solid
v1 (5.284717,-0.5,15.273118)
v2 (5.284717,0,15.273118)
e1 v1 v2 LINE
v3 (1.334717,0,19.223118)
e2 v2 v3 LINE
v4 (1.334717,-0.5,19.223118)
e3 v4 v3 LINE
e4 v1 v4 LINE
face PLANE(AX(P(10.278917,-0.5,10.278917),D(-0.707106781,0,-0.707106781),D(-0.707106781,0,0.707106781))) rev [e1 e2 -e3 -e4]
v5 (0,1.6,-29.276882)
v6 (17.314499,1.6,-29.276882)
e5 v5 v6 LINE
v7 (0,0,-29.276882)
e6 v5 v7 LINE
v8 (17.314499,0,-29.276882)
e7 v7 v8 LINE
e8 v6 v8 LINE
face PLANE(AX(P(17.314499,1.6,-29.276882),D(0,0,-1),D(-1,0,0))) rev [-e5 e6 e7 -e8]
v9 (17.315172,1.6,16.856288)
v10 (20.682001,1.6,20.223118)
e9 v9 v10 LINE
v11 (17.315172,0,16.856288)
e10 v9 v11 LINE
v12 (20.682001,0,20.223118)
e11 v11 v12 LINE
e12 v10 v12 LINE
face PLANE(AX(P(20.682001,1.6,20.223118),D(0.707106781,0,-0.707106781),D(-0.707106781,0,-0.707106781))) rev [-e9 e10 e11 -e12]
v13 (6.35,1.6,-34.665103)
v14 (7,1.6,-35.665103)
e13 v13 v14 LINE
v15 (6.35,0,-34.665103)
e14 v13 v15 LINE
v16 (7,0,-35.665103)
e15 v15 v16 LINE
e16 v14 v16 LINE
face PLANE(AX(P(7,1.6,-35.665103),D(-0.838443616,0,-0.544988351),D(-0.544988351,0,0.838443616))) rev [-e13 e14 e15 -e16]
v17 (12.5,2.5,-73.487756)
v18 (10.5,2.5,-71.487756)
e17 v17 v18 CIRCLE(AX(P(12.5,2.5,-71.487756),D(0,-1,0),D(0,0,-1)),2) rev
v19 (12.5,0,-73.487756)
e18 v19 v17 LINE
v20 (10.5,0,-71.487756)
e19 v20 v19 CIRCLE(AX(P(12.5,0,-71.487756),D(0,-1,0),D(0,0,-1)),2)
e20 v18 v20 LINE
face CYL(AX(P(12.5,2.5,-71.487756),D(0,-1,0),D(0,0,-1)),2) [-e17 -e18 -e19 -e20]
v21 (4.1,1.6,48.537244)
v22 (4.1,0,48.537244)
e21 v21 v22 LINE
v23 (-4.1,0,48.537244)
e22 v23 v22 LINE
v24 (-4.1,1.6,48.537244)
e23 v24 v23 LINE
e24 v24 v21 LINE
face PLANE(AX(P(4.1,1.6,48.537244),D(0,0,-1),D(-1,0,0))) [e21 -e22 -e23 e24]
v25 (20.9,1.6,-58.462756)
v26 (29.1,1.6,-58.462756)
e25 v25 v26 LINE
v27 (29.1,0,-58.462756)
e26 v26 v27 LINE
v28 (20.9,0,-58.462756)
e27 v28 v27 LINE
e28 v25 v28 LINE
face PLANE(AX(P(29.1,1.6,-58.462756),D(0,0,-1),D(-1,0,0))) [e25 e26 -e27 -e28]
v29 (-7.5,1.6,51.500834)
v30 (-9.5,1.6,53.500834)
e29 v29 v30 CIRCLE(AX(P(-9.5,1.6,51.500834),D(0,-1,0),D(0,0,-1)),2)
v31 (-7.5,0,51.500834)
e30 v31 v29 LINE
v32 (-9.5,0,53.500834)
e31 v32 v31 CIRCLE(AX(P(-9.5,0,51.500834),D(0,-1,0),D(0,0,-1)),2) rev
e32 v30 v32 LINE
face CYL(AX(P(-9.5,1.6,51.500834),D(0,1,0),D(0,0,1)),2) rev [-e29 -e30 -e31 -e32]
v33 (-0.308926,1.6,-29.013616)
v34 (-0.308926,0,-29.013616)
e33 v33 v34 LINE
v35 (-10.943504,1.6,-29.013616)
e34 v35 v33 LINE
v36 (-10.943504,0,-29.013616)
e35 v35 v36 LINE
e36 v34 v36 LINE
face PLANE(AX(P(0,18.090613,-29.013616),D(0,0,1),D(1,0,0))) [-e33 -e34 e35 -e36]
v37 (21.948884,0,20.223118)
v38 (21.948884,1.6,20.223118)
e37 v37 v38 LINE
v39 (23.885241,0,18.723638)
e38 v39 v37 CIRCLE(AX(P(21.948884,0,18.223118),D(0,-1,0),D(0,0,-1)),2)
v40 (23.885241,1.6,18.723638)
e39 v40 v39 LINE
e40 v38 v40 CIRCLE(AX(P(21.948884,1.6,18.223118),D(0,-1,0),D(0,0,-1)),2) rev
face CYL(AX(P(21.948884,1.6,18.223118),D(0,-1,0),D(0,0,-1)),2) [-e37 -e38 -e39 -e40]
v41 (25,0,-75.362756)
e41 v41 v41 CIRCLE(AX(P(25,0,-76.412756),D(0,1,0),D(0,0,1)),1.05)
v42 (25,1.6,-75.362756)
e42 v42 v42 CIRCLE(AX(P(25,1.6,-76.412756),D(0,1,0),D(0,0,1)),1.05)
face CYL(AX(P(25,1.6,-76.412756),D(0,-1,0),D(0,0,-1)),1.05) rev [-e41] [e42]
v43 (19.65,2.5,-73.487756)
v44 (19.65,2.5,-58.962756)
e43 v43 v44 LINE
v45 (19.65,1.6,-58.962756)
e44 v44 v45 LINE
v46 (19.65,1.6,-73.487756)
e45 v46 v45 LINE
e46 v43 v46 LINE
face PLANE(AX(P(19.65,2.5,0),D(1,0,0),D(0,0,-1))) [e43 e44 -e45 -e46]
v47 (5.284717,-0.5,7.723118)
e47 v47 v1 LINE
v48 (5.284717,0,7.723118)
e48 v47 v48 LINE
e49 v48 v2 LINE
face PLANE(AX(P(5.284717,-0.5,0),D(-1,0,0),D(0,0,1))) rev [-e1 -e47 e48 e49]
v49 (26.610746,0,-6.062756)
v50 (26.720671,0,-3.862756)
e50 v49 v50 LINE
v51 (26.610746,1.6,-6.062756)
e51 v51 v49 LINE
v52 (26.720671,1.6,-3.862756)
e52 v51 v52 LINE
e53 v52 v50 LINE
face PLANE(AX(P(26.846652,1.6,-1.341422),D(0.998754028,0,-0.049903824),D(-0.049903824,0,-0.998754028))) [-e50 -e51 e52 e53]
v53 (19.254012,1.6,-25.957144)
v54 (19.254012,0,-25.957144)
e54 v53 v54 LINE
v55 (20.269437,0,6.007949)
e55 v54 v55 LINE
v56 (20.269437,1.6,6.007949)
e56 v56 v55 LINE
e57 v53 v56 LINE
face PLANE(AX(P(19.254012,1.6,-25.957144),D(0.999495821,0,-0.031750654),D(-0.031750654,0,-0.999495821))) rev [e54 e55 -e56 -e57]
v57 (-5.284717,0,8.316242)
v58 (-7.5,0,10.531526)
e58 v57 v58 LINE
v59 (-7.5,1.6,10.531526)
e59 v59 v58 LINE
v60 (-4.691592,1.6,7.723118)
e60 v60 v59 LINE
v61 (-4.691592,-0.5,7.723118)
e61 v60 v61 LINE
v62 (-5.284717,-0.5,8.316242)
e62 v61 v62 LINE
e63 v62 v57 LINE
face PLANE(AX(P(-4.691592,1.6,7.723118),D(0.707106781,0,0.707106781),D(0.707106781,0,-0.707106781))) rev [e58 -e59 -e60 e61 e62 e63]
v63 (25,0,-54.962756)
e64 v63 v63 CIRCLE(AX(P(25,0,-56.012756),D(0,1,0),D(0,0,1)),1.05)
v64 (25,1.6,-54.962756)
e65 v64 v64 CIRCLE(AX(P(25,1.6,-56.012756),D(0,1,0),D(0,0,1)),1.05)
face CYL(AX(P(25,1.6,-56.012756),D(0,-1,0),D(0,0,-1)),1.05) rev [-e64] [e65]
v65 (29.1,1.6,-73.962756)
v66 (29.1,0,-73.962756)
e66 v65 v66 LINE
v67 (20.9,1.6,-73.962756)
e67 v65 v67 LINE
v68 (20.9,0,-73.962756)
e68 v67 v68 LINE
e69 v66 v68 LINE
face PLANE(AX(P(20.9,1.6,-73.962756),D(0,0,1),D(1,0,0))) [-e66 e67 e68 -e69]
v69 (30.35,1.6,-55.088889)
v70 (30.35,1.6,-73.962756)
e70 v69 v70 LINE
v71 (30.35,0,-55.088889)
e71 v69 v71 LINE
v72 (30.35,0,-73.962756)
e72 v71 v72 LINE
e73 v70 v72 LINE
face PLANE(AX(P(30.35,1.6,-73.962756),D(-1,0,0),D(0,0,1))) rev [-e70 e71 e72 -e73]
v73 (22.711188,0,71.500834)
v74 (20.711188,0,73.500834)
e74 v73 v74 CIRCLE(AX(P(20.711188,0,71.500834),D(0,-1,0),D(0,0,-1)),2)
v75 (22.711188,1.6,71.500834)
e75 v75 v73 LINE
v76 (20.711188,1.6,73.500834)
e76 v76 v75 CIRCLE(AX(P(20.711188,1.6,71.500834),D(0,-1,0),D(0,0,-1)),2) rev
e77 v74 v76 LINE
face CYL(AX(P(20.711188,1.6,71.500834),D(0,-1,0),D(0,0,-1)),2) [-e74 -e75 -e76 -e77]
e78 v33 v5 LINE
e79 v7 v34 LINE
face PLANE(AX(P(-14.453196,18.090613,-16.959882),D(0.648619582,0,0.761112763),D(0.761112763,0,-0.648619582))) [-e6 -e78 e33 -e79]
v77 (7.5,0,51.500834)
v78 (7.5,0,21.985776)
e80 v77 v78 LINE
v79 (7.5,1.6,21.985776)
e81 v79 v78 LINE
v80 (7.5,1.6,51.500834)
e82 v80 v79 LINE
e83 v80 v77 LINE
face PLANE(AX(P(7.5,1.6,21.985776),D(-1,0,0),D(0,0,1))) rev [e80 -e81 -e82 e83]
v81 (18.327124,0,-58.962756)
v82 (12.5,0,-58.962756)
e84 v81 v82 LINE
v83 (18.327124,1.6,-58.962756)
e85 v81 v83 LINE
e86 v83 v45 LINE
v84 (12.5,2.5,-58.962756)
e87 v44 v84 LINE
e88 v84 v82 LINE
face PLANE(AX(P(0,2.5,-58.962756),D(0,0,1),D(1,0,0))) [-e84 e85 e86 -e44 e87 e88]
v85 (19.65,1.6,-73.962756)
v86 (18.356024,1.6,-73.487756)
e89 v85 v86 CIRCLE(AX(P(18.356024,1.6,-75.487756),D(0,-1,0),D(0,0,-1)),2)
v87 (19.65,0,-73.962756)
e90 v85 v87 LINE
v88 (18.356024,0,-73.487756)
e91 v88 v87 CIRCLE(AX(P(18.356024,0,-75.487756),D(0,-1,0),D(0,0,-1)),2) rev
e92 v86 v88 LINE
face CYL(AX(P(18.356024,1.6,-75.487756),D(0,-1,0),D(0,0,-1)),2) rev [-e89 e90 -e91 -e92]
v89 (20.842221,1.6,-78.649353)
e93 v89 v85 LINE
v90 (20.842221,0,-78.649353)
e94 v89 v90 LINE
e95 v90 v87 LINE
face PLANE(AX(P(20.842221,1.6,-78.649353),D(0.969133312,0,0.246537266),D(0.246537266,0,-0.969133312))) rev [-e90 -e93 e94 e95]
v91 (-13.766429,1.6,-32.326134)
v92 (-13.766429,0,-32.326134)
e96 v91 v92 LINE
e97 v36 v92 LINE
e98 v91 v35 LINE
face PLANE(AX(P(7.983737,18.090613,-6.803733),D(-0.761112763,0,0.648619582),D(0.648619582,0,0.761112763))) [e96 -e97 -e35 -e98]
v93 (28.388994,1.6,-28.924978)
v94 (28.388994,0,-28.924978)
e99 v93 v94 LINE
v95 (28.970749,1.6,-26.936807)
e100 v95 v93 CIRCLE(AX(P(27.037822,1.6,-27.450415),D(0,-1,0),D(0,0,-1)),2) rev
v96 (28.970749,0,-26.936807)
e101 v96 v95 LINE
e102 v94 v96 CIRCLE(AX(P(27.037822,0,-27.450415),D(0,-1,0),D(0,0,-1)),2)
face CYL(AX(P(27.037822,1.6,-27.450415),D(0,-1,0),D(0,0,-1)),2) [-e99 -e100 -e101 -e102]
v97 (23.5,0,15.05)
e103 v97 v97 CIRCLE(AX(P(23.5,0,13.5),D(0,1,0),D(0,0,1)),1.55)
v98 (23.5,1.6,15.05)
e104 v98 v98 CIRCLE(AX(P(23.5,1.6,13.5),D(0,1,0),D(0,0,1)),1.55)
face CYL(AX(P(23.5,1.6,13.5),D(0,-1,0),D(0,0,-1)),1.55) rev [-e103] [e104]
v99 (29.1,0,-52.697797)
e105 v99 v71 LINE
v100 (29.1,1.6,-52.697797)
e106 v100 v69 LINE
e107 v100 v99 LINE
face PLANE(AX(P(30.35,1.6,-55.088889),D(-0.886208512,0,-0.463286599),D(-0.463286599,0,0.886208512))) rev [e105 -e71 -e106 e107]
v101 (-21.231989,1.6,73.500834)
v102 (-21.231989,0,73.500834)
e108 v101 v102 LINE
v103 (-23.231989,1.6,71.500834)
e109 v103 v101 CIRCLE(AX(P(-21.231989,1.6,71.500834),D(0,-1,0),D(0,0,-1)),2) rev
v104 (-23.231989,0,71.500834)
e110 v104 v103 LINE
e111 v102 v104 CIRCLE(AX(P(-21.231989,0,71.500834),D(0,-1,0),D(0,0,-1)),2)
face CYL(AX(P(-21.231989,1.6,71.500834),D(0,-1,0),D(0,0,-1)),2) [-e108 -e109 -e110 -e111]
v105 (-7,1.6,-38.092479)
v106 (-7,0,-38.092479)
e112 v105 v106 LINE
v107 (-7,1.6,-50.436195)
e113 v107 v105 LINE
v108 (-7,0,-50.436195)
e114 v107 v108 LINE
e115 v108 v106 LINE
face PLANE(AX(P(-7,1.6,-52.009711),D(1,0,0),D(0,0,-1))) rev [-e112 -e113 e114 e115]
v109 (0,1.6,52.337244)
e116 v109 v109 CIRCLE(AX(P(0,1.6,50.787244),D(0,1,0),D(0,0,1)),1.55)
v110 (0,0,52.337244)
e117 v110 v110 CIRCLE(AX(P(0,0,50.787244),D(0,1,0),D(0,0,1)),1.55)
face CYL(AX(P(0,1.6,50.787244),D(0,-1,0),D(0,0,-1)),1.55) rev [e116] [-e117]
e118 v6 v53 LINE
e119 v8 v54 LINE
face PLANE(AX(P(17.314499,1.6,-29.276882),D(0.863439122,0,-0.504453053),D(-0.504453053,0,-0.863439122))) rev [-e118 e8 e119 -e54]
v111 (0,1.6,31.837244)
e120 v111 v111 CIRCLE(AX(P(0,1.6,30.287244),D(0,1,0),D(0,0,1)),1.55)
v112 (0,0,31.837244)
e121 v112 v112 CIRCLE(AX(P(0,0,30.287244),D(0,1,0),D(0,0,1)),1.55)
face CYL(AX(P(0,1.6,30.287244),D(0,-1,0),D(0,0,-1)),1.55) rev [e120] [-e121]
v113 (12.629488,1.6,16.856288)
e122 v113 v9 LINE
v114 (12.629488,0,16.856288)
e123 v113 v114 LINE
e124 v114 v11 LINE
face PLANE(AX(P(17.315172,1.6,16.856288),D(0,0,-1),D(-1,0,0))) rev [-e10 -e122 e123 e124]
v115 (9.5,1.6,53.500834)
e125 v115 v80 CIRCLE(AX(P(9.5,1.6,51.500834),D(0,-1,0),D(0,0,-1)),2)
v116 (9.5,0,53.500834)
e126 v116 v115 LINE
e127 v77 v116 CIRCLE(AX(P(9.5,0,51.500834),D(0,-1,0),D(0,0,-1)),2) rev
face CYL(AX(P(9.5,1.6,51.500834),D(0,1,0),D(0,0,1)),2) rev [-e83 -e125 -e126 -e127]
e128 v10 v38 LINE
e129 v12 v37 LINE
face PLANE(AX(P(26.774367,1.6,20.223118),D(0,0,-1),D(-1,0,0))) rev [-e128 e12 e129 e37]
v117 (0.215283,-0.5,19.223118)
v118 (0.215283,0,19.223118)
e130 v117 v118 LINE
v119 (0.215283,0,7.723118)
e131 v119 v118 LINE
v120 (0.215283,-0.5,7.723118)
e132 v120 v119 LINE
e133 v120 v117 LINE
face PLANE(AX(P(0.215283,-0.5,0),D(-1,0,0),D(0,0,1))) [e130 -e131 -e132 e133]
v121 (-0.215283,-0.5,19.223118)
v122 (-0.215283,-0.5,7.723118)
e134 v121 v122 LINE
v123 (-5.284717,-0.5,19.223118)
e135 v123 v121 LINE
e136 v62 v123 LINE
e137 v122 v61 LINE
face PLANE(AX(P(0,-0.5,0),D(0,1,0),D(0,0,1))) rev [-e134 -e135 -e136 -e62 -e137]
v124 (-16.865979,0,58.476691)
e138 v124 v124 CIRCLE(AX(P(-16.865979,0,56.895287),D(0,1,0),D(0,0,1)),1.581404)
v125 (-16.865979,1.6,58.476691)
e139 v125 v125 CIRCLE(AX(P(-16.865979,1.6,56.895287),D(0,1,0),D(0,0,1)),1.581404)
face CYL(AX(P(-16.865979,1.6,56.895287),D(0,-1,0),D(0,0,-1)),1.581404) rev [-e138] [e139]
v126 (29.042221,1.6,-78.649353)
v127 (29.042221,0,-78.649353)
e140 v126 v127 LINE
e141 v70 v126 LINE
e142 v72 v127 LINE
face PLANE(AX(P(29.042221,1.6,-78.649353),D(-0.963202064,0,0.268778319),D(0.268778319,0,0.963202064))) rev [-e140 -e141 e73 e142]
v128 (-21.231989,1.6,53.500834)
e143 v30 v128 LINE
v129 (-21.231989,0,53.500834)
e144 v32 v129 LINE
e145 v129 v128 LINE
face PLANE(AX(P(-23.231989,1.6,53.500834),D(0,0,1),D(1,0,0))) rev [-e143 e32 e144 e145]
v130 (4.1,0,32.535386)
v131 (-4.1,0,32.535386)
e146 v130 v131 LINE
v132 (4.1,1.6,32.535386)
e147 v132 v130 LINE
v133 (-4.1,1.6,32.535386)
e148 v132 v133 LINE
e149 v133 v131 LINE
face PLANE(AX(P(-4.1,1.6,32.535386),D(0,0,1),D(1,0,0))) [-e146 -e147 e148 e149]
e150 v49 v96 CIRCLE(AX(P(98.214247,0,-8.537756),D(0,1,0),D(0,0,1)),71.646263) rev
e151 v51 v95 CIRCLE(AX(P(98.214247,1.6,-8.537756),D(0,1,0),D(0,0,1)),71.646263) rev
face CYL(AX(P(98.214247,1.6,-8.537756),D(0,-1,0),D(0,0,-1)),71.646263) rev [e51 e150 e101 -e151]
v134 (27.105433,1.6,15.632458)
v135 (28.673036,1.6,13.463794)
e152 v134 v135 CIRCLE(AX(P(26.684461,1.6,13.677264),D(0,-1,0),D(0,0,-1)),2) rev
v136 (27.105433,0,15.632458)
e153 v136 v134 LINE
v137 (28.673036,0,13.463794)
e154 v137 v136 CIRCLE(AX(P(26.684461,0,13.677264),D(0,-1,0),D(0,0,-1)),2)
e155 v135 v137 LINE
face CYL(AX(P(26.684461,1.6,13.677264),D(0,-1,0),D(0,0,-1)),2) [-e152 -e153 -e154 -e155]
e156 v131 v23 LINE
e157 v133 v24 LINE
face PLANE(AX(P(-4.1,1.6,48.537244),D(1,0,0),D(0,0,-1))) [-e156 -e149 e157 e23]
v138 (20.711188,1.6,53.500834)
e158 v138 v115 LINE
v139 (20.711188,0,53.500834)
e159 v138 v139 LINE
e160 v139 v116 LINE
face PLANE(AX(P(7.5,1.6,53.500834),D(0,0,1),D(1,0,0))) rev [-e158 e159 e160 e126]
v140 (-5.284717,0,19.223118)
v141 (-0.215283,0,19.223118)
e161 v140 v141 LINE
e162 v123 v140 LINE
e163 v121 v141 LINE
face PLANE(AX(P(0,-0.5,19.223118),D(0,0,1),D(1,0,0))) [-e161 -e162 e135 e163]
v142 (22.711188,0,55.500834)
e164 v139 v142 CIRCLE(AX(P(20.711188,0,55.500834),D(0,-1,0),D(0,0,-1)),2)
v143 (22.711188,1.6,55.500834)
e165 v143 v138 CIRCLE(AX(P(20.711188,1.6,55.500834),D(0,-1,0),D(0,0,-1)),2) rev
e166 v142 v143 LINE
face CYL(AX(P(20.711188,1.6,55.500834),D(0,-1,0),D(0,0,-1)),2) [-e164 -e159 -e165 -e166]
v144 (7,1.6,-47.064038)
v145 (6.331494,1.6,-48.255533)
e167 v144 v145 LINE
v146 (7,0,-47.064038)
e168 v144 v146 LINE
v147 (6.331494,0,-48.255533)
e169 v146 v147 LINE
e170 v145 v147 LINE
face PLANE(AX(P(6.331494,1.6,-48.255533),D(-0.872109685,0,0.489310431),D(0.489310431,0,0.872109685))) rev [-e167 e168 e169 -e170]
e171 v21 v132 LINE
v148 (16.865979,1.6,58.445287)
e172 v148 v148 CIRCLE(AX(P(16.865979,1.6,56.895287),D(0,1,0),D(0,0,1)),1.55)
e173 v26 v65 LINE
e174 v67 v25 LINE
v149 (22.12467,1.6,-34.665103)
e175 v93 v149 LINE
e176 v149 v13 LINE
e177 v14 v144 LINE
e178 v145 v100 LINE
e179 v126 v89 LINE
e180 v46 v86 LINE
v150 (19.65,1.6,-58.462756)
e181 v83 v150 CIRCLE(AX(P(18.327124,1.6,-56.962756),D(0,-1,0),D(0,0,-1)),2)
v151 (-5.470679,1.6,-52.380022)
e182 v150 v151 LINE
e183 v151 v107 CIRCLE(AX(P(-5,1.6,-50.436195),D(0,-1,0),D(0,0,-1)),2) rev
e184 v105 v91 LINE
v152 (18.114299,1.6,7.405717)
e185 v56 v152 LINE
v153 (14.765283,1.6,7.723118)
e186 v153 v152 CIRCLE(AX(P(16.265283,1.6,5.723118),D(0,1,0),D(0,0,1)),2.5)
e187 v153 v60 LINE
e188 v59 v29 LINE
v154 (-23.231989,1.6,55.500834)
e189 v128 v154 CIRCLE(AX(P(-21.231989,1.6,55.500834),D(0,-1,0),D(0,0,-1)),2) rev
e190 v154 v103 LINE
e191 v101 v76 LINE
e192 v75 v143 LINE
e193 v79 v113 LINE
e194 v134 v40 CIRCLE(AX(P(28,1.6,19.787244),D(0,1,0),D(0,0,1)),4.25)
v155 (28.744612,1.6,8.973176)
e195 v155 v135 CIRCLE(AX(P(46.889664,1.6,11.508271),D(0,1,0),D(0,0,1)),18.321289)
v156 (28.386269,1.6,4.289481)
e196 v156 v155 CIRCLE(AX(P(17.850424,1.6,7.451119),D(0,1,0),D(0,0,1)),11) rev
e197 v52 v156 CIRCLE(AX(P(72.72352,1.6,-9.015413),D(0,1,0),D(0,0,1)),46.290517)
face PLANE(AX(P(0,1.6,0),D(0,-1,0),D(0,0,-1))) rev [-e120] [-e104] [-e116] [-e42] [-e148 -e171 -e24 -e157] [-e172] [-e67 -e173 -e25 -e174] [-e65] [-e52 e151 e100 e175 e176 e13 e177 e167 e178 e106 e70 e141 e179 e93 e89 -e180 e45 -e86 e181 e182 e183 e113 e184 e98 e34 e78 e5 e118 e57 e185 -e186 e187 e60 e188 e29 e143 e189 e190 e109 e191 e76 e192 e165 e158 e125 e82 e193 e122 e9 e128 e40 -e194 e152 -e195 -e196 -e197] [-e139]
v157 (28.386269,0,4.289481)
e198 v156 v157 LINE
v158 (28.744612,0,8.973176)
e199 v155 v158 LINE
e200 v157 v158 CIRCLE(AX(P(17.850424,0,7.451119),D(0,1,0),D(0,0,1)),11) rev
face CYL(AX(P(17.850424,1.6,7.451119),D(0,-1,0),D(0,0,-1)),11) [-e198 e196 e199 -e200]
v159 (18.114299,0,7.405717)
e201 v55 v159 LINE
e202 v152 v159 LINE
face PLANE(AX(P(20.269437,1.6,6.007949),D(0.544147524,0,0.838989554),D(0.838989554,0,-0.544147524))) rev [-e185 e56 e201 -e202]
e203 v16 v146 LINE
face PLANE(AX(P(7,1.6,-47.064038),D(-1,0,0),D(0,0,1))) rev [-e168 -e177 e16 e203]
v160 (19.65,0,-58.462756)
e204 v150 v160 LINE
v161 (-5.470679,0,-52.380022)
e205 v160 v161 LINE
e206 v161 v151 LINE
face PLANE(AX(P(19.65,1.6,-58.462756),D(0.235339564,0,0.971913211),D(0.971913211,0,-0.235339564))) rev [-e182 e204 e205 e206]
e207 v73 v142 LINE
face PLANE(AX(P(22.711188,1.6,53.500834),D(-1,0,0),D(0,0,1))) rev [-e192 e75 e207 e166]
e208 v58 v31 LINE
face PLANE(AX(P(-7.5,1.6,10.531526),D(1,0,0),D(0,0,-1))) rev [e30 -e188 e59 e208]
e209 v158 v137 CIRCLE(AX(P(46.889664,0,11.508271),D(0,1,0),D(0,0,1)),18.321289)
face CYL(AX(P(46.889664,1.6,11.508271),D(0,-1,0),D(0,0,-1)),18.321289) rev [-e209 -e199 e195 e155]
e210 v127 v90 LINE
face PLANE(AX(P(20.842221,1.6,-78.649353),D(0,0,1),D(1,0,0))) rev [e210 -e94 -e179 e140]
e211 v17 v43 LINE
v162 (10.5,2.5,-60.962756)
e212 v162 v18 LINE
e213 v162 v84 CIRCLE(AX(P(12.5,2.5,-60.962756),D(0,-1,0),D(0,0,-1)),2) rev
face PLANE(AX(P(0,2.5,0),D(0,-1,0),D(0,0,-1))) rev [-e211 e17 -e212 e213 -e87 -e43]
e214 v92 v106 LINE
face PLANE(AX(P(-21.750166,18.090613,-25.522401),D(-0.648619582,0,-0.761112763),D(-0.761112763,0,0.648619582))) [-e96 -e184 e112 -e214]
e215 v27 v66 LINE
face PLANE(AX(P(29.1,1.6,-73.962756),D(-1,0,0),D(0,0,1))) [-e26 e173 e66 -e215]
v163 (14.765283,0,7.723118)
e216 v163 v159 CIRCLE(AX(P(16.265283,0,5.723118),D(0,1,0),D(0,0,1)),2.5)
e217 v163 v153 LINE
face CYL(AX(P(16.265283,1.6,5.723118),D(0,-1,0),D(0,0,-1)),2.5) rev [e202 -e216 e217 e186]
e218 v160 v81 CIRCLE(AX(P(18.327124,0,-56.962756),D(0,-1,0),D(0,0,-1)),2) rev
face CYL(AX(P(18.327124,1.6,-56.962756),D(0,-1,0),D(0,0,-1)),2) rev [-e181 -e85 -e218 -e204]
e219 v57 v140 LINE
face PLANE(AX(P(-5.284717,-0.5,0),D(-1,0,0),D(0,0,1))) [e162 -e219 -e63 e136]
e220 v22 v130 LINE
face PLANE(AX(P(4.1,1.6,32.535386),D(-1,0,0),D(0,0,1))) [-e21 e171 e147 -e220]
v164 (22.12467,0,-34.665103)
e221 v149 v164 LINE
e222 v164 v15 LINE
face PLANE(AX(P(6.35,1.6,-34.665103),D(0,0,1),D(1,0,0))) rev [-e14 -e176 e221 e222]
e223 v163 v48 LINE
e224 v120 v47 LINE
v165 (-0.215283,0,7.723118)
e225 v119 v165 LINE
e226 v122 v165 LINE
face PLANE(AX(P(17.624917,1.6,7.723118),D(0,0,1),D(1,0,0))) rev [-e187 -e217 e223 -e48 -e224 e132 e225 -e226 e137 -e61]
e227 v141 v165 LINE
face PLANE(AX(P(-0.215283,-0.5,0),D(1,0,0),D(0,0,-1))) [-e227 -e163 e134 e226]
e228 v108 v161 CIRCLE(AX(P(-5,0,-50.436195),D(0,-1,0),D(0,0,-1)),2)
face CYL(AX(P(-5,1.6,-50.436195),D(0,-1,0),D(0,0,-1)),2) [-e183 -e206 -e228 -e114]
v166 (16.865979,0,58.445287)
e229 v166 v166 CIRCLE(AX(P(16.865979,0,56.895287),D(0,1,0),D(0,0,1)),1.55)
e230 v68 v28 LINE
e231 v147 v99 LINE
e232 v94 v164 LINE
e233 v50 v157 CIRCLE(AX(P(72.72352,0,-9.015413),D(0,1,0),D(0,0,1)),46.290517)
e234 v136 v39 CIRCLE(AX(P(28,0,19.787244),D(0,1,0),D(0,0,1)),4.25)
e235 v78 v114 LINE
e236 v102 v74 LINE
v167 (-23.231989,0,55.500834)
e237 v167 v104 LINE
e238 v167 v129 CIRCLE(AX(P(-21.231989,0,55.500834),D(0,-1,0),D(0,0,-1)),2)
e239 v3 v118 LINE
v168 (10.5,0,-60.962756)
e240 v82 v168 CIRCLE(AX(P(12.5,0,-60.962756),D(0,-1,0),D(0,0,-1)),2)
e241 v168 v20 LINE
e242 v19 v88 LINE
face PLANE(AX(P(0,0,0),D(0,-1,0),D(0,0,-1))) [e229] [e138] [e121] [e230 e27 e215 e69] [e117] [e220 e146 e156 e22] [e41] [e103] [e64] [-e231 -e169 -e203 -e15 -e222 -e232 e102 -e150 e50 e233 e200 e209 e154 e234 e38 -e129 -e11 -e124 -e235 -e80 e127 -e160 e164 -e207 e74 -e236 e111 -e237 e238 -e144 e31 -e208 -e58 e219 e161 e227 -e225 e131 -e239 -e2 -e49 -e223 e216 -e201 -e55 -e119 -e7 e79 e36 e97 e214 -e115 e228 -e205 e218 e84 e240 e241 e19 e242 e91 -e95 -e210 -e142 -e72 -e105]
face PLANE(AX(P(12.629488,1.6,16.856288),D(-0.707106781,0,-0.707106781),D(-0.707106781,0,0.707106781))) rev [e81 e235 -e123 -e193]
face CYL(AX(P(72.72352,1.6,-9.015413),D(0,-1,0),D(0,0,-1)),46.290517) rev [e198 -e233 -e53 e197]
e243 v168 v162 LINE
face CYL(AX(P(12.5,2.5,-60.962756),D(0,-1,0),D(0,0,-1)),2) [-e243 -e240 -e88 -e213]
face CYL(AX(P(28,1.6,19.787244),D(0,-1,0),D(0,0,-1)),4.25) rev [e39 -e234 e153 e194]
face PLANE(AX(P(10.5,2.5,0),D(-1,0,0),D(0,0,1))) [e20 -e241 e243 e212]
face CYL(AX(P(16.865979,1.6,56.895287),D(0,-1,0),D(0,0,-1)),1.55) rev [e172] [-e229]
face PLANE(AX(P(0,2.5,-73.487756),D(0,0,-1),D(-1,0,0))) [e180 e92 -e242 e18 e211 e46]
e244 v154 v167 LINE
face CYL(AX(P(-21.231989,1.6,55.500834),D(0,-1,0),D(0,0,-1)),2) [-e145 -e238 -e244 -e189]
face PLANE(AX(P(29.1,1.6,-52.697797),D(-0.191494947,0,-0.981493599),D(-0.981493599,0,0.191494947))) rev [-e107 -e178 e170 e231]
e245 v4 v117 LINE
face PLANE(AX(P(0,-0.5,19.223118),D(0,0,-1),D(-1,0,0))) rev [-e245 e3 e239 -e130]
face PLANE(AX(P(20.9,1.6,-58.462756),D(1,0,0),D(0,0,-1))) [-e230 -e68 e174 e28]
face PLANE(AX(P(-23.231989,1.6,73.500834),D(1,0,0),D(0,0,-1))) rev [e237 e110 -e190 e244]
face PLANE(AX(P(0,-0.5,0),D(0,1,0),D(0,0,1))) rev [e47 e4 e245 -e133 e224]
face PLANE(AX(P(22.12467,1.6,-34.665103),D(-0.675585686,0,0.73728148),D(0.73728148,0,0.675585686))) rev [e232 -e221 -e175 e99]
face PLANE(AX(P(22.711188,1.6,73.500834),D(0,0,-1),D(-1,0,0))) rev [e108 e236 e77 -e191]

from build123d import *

# Parameters (mm, degrees)
SKETCH_1_R            = 1.55
SKETCH_1_R_2          = 1.05
SKETCH_1_R_3          = 1.581404189
SKETCH_1_W            = 8.2
SKETCH_1_H            = 15.5
SKETCH_1_H_2          = 16.001858204
EXTRUDE_1_DEPTH       = 1.6
SKETCH_1900_R         = 4.25
SKETCH_1900_R_2       = 2.5
CUT_EXTRUDE_5_DEPTH   = 85.317277267
EXTRUDE_3627_DEPTH    = 0.5
SKETCH_3_W            = 9.15
SKETCH_3_H            = 14.525
JST_GH_4PIN_X_2_DEPTH = 2.5
FILLET_3_R            = 2
EXTRUDE_START         = -1.6
EXTRUDE_5402_DEPTH    = 1.6


with BuildPart() as part:
    # 草图1 → 凸台-拉伸1 (new body)
    with BuildSketch(Plane(origin=(0, 0, 0), x_dir=(1, 0, 0), z_dir=(0, 1, 0))):
        Polygon((17.624917378, -7.723117708), (-4.691592189, -7.723117708), (-7.5, -10.531525519), (-7.5, -53.500834243), (-23.23198905, -53.500834243), (-23.23198905, -73.500834243), (22.7111878, -73.500834243), (22.7111878, -53.500834243), (7.5, -53.500834243), (7.5, -21.98577592), (12.62948765, -16.856288271), (17.315171978, -16.856288271), (20.682001416, -20.223117708), (26.774367048, -20.223117708), (29.820182402, -19.217148973), (29.820182402, 27.613551536), (22.124670003, 34.665102629), (18.4, 34.665102629), (6.35, 34.665102629), (7, 35.665102629), (7, 47.064038047), (6.331493599, 48.255532994), (29.1, 52.697797243), (30.35, 55.088888723), (30.35, 73.962756038), (29.042220737, 78.649353117), (20.842220737, 78.649353117), (19.65, 73.962756038), (19.65, 58.462756038), (-7, 52.009711353), (-7, 37.490925595), (0, 29.276882292), (17.314498575, 29.276882292), (19.254012403, 25.957144), (20.269436965, -6.007948815), align=None)
        with Locations(Location((0, -30.287243962, 0), (0, 0, 270))):
            Circle(SKETCH_1_R, mode=Mode.SUBTRACT)
        with Locations(Location((0, -50.787243962, 0), (0, 0, 270))):
            Circle(SKETCH_1_R, mode=Mode.SUBTRACT)
        with Locations(Location((25, 76.412756037, 0), (0, 0, 270))):
            Circle(SKETCH_1_R_2, mode=Mode.SUBTRACT)
        with Locations(Location((25, 56.012756039, 0), (0, 0, 270))):
            Circle(SKETCH_1_R_2, mode=Mode.SUBTRACT)
        with Locations(Location((23.5, -13.5, 0), (0, 0, 270))):
            Circle(SKETCH_1_R, mode=Mode.SUBTRACT)
        with Locations(Location((-16.865979253, -56.895287035, 0), (0, 0, 270))):
            Circle(SKETCH_1_R_3, mode=Mode.SUBTRACT)
        with Locations(Location((16.865979253, -56.895287035, 0), (0, 0, 270))):
            Circle(SKETCH_1_R, mode=Mode.SUBTRACT)
        with Locations((25, 66.212756038)):
            Rectangle(SKETCH_1_W, SKETCH_1_H, mode=Mode.SUBTRACT)
        with Locations((0, -40.536314862)):
            Rectangle(SKETCH_1_W, SKETCH_1_H_2, mode=Mode.SUBTRACT)
    extrude(amount=EXTRUDE_1_DEPTH)

    # Sketch 1900 → 切除-拉伸5 (cut, through all)
    with BuildSketch(Plane(origin=(0, 0, 0), x_dir=(1, 0, 0), z_dir=(0, 1, 0))):
        with BuildLine():
            ThreePointArc((32.25, -19.787243962), (31.591537652, -17.514941761), (29.820184804, -15.946745651))
            Line((29.820184804, -15.946745651), (29.820138471, -18.164164281))
            ThreePointArc((29.820138471, -18.164164281), (29.388960143, -16.929984913), (29.04688934, -15.668200055))
            ThreePointArc((29.04688934, -15.668200055), (24.645020142, -22.396192055), (32.25, -19.787243962))
        make_face()
        with BuildLine():
            Line((29.820138471, -18.164164281), (29.820184804, -15.946745651))
            ThreePointArc((29.820184804, -15.946745651), (29.440286586, -15.788734921), (29.04688934, -15.668200055))
            ThreePointArc((29.04688934, -15.668200055), (29.388960143, -16.929984913), (29.820138471, -18.164164281))
        make_face()
        with Locations((28, -19.787243962)):
            Circle(SKETCH_1900_R)
        with BuildLine():
            ThreePointArc((29.389676683, 28.446687445), (29.699958614, 29.863367854), (29.821172201, 31.308554874))
            Line((29.821172201, 31.308554874), (29.820138471, -18.164164281))
            ThreePointArc((29.820138471, -18.164164281), (28.692543787, -13.637691906), (28.744612063, -8.973175765))
            ThreePointArc((28.744612063, -8.973175765), (28.818369707, -6.611977276), (28.386269498, -4.289481227))
            ThreePointArc((28.386269498, -4.289481227), (27.36992989, -0.250862064), (26.720671038, 3.862756038))
            Line((26.720671038, 3.862756038), (26.610745663, 6.062756038))
            ThreePointArc((26.610745663, 6.062756038), (27.113818567, 17.364766035), (29.389676683, 28.446687445))
        make_face()
        with Locations((28, 36.212756038)):
            Circle(SKETCH_1900_R)
        with Locations((16.265283418, -5.723117708)):
            Circle(SKETCH_1900_R_2)
    extrude(amount=CUT_EXTRUDE_5_DEPTH, mode=Mode.SUBTRACT)

    # Sketch 2795 → Extrude 3627 (add)
    with BuildSketch(Plane(origin=(0, 0, 0), x_dir=(1, 0, 0), z_dir=(0, 1, 0))):
        Polygon((5.284716582, -7.723117708), (0.215283418, -7.723117708), (0.215283418, -19.223117708), (1.334716582, -19.223117708), (5.284716582, -15.273117708), align=None)
        Polygon((-0.215283418, -7.723117708), (-4.691592189, -7.723117708), (-5.284716582, -8.316242101), (-5.284716582, -19.223117708), (-0.215283418, -19.223117708), align=None)
    extrude(amount=-EXTRUDE_3627_DEPTH)

    # Sketch 3 → JST-GH-4Pin x 2 (add)
    with BuildSketch(Plane(origin=(0, 0, 0), x_dir=(1, 0, 0), z_dir=(0, 1, 0))):
        with Locations((15.075, 66.225256038)):
            Rectangle(SKETCH_3_W, SKETCH_3_H)
    extrude(amount=JST_GH_4PIN_X_2_DEPTH)

    # 圆角3
    # the kernel refuses this fillet: 2 mm, written as the material it adds along each edge
    with BuildSketch(Plane(origin=(19.65, 0, -58.962756038), x_dir=(0, 0, 1), z_dir=(0, 1, 0))) as fillet_3_piece_1:
        with BuildLine():
            CenterArc((2, -1.322875656), FILLET_3_R, 138.590377891, 41.409622109)
            Line((0, -1.322875656), (0, 0))
            Line((0, 0), (0.5, 0))
        make_face()
    extrude(amount=1.6)
    with BuildSketch(Plane(origin=(19.65, 0, -73.487756038), x_dir=(0, 0, -1), z_dir=(0, 1, 0))) as fillet_3_piece_2:
        with BuildLine():
            CenterArc((2, 1.293976429), FILLET_3_R, 180, 40.314909173)
            Line((0, 1.293976429), (0, 0))
            Line((0, 0), (0.475, 0))
        make_face()
    extrude(amount=1.6)
    with BuildSketch(Plane(origin=(7.5, 0, 53.500834243), x_dir=(0, 0, -1), z_dir=(0, 1, 0)), Plane(origin=(-7.5, 0, 53.500834243), x_dir=(-1, 0, 0), z_dir=(0, 1, 0))) as fillet_3_piece_3:
        with BuildLine():
            CenterArc((FILLET_3_R, -FILLET_3_R), FILLET_3_R, 90, 90)
            Line((0, -FILLET_3_R), (0, 0))
            Line((0, 0), (FILLET_3_R, 0))
        make_face()
    extrude(amount=1.6)
    # the kernel refuses this fillet: 2 mm, written as the material it takes off along each edge
    with BuildSketch(Plane(origin=(10.5, -5, -58.962756038), x_dir=(0, 0, -1), z_dir=(0, 1, 0)), Plane(origin=(10.5, -5, -73.487756038), x_dir=(1, 0, 0), z_dir=(0, 1, 0))) as fillet_3_2_piece_1:
        with BuildLine():
            CenterArc((FILLET_3_R, -FILLET_3_R), FILLET_3_R, 90, 90)
            Line((0, -FILLET_3_R), (0, 0))
            Line((0, 0), (FILLET_3_R, 0))
        make_face()
    extrude(amount=12.5, mode=Mode.SUBTRACT)
    with BuildSketch(Plane(origin=(-7, -3.933789701, -52.009711353), x_dir=(0.9719132109472551, 0, -0.23533956400528205), z_dir=(0, 1, 0))) as fillet_3_2_piece_2:
        with BuildLine():
            CenterArc((FILLET_3_R * 0.786757940299, -FILLET_3_R), FILLET_3_R, 90, 76.388360252)
            Line((-FILLET_3_R * 0.185155270648, -FILLET_3_R * 0.764660435995), (0, 0))
            Line((0, 0), (FILLET_3_R * 0.786757940299, 0))
        make_face()
    extrude(amount=9.467579403, mode=Mode.SUBTRACT)
    with BuildSketch(Plane(origin=(23.77241037, 6.158816797, 20.223117708), x_dir=(-1, 0, 0), z_dir=(0, -1, 0))) as fillet_3_2_piece_3:
        with BuildLine():
            CenterArc((1.823526719, 2), FILLET_3_R, 194.492910043, 75.507089957)
            ThreePointArc((-0.112830513, 1.499479599), (0.010429415, 0.754769623), (0, 0))
            Line((0, 0), (1.823526719, 0))
        make_face()
    extrude(amount=10.717633594, mode=Mode.SUBTRACT)
    with BuildSketch(Plane(origin=(-23.23198905, -5, 73.500834243), x_dir=(0, 0, -1), z_dir=(0, 1, 0)), Plane(origin=(22.7111878, -5, 73.500834243), x_dir=(-1, 0, 0), z_dir=(0, 1, 0)), Plane(origin=(22.7111878, -5, 53.500834243), x_dir=(0, 0, 1), z_dir=(0, 1, 0)), Plane(origin=(-23.23198905, -5, 53.500834243), x_dir=(1, 0, 0), z_dir=(0, 1, 0))) as fillet_3_2_piece_4:
        with BuildLine():
            CenterArc((FILLET_3_R, -FILLET_3_R), FILLET_3_R, 90, 90)
            Line((0, -FILLET_3_R), (0, 0))
            Line((0, 0), (FILLET_3_R, 0))
        make_face()
    extrude(amount=11.6, mode=Mode.SUBTRACT)
    with BuildSketch(Plane(origin=(29.290123585, 4.655582445, -28.099254974), x_dir=(-0.26492584299558386, 0, 0.9642687891418446), z_dir=(0, -1, 0))) as fillet_3_2_piece_5:
        with BuildLine():
            CenterArc((1.222348791, 1.99992922), FILLET_3_R, 207.137102211, 62.380861619)
            Line((-0.557486463, 1.087686672), (0, 0))
            ThreePointArc((0, 0), (0.602761377, 0.002535566), (1.205522753, 0))
        make_face()
    extrude(amount=7.71116489, mode=Mode.SUBTRACT)
    with BuildSketch(Plane(origin=(29.04688934, 7.189707678, 15.668200055), x_dir=(-0.9998305759549154, 0, -0.018407047173896997), z_dir=(0, -1, 0))) as fillet_3_2_piece_6:
        with BuildLine():
            CenterArc((2.398675677, 1.947113498), FILLET_3_R, 172.818157219, 83.976285302)
            ThreePointArc((0.414366937, 2.197151144), (0.240731561, 1.092248642), (0, 0))
            ThreePointArc((0, 0), (0.970892536, 0.112383816), (1.941785072, 0))
        make_face()
    extrude(amount=12.779415356, mode=Mode.SUBTRACT)

    # Sketch 3 2 → Extrude 5402 (add)
    with BuildSketch(Plane(origin=(0, 1.6, 0), x_dir=(1, 0, 0), z_dir=(0, 1, 0)).offset(EXTRUDE_START)):
        Polygon((-13.766428784, 32.326134419), (-10.943503558, 29.013615841), (-0.308926004, 29.013615841), (0, 29.276882292), (-7, 37.490925595), (-7, 38.092478683), align=None)
    extrude(amount=EXTRUDE_5402_DEPTH)


solid = part.part
